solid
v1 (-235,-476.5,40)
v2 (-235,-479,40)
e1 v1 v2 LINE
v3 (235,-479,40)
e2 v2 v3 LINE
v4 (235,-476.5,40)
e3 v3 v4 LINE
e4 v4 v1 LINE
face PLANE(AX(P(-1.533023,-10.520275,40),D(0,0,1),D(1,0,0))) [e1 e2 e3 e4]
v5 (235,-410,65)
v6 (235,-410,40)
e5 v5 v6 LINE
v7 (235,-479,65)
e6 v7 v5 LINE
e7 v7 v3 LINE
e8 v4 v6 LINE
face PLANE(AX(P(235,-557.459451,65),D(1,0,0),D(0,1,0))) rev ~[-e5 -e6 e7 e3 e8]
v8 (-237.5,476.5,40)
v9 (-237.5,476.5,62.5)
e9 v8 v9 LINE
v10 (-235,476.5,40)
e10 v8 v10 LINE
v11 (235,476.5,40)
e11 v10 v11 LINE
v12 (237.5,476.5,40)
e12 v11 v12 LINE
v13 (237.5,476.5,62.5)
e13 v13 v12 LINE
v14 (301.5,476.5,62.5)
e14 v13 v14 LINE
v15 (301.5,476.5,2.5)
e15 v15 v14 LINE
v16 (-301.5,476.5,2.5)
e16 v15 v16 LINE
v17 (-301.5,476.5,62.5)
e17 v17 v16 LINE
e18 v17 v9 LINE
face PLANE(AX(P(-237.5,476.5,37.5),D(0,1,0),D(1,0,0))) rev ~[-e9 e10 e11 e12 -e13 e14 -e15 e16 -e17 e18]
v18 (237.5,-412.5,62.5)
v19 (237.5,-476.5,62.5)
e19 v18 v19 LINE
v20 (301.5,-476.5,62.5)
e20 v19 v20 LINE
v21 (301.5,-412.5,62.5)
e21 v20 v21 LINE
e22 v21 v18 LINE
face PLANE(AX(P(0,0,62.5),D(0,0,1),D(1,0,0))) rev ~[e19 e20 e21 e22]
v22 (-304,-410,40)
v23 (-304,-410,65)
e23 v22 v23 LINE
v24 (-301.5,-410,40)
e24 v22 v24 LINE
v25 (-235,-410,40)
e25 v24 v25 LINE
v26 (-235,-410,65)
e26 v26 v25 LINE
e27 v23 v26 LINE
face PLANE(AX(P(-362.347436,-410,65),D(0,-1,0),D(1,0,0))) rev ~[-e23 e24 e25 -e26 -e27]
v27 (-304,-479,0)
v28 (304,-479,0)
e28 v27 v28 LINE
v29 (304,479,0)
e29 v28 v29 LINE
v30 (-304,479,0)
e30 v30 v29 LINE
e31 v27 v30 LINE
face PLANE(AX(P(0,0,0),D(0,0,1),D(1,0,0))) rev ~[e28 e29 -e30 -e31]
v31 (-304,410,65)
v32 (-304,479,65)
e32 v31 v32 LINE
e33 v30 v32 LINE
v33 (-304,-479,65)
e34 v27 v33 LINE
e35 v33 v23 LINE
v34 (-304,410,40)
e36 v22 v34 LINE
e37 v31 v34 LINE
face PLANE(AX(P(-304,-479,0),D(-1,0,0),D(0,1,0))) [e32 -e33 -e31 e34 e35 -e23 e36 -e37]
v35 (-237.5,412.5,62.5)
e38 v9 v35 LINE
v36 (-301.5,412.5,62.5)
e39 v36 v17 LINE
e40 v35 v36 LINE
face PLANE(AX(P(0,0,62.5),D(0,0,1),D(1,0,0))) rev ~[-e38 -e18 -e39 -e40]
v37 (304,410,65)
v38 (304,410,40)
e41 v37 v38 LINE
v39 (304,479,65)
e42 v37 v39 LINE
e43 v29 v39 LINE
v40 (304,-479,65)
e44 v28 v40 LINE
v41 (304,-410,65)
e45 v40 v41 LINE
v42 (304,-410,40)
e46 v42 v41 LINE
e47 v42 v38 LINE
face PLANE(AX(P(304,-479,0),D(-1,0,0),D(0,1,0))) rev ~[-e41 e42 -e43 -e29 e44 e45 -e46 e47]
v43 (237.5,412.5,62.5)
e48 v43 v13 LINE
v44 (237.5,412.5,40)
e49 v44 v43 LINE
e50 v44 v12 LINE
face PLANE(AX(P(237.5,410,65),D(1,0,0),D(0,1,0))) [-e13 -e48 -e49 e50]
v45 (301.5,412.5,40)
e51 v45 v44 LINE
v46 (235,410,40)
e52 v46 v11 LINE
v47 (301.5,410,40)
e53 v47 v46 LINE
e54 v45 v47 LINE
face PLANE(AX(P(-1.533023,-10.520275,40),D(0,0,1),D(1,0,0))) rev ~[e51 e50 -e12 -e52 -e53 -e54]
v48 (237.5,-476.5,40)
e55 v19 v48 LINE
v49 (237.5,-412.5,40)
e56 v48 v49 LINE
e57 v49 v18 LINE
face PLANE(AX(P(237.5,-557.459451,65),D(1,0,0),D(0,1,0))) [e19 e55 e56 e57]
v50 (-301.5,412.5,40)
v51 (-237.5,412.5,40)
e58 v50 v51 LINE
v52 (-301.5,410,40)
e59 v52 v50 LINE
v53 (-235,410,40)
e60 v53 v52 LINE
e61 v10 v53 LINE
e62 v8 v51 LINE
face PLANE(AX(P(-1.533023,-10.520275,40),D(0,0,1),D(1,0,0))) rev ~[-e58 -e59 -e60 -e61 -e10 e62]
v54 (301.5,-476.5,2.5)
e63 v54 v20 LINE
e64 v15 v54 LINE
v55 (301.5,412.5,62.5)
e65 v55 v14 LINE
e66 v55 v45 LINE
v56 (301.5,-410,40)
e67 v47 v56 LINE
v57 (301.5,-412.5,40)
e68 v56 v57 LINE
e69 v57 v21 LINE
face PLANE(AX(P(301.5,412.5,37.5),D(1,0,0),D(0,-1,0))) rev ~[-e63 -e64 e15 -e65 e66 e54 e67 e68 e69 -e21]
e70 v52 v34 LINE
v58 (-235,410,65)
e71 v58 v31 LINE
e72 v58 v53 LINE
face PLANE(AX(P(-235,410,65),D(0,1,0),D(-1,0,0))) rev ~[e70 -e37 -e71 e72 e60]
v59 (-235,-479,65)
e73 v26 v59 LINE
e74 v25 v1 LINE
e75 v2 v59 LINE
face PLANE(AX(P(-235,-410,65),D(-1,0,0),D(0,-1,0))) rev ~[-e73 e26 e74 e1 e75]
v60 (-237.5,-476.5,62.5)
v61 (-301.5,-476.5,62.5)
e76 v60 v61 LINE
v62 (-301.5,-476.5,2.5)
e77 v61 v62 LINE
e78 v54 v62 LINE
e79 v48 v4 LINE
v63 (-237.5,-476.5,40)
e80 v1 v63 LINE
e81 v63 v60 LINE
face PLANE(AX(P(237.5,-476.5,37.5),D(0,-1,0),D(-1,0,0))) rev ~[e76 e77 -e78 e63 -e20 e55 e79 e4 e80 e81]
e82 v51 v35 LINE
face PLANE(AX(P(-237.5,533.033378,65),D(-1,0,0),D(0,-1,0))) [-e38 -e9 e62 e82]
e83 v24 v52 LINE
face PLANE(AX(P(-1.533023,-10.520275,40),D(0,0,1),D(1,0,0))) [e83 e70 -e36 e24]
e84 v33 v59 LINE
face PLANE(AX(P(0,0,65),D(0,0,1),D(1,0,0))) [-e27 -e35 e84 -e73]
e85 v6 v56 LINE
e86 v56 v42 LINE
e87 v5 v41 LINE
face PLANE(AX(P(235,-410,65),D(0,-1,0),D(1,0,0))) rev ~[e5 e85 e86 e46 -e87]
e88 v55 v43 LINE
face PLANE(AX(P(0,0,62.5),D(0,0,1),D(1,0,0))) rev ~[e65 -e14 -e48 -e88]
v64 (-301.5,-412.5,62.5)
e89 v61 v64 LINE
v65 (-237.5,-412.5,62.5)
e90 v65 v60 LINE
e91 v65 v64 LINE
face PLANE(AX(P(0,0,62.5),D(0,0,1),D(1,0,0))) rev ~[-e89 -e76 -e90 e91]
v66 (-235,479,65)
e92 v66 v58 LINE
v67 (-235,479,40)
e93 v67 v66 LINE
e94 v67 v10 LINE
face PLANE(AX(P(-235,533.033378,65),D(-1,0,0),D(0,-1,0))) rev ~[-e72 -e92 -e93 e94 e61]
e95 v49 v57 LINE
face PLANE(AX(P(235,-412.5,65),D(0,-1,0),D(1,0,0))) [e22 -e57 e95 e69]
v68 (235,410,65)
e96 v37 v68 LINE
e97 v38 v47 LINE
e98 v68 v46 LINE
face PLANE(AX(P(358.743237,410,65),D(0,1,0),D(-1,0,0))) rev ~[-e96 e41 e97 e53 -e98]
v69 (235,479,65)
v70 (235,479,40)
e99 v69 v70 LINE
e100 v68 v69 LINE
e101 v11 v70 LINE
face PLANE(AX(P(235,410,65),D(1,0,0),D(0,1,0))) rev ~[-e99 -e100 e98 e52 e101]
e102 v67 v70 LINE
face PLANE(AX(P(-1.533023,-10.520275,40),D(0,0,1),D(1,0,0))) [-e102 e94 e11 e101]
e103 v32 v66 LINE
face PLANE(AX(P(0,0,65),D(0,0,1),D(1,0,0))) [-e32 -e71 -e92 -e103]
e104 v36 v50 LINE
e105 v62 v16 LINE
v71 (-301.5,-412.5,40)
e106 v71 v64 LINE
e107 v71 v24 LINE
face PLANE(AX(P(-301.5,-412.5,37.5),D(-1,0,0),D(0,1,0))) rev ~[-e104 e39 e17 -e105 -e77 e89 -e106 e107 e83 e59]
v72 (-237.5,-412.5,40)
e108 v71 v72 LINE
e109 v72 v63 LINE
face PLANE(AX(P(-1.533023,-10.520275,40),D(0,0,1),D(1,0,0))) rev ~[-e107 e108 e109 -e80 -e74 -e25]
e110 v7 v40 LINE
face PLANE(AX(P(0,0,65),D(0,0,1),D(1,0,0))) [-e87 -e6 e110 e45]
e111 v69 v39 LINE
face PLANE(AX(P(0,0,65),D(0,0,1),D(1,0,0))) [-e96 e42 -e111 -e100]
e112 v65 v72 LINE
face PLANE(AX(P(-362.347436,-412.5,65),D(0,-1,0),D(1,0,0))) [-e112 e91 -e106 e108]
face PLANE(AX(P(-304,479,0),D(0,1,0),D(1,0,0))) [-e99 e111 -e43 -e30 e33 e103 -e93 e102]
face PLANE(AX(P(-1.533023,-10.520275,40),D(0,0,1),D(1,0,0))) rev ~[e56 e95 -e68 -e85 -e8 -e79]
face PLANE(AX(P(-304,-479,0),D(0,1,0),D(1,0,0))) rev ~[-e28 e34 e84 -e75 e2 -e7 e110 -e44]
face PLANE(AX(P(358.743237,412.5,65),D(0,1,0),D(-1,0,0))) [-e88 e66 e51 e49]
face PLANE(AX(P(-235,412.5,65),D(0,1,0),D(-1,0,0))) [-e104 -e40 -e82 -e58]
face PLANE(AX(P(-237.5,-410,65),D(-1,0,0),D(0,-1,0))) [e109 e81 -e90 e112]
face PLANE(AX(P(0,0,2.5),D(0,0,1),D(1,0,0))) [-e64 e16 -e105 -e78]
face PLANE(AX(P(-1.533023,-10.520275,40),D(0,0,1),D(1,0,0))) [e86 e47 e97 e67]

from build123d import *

# Parameters (mm, degrees)
F0_W     = 608
F0_H     = 958
F1_DEPTH = 65
F3_DEPTH = 25
F4_T     = -2.5


# Not quite as in the source:
# - a shell that OpenCascade refuses in one call is made with other operations: the cavity is built on its own and cut out


with BuildPart() as f1:
    # F0 (on Top) → F1 (new body)
    with BuildSketch(Plane.XY):
        Rectangle(F0_W, F0_H)
    extrude(amount=F1_DEPTH)

    # F2 (on face) → F3 (cut)
    with BuildSketch(Plane.XY.offset(65)):
        Polygon((235, 533.0333780003), (-235, 533.0333780003), (-235, 410), (-362.3474363838, 410), (-362.3474363838, -410), (-235, -410), (-235, -557.4594508362), (235, -557.4594508362), (235, -410), (358.7432372559, -410), (358.7432372559, 410), (235, 410), align=None)
    extrude(amount=-F3_DEPTH, mode=Mode.SUBTRACT)

    # F4: a shell. OpenCascade refuses it in one call, so the cavity is built on its own and cut out:
    # the body offset inwards by the wall thickness, plus a prism from it out through each open face.
    f4_core = offset(f1.part, amount=F4_T, kind=Kind.INTERSECTION, mode=Mode.PRIVATE)
    f4_exits = [f4_core.faces().sort_by_distance(p)[0] for p in [
        (0, 0, 37.5),
    ]]
    add(f4_core, mode=Mode.SUBTRACT)
    extrude(f4_exits, amount=-F4_T, mode=Mode.SUBTRACT)


solid = f1.part
